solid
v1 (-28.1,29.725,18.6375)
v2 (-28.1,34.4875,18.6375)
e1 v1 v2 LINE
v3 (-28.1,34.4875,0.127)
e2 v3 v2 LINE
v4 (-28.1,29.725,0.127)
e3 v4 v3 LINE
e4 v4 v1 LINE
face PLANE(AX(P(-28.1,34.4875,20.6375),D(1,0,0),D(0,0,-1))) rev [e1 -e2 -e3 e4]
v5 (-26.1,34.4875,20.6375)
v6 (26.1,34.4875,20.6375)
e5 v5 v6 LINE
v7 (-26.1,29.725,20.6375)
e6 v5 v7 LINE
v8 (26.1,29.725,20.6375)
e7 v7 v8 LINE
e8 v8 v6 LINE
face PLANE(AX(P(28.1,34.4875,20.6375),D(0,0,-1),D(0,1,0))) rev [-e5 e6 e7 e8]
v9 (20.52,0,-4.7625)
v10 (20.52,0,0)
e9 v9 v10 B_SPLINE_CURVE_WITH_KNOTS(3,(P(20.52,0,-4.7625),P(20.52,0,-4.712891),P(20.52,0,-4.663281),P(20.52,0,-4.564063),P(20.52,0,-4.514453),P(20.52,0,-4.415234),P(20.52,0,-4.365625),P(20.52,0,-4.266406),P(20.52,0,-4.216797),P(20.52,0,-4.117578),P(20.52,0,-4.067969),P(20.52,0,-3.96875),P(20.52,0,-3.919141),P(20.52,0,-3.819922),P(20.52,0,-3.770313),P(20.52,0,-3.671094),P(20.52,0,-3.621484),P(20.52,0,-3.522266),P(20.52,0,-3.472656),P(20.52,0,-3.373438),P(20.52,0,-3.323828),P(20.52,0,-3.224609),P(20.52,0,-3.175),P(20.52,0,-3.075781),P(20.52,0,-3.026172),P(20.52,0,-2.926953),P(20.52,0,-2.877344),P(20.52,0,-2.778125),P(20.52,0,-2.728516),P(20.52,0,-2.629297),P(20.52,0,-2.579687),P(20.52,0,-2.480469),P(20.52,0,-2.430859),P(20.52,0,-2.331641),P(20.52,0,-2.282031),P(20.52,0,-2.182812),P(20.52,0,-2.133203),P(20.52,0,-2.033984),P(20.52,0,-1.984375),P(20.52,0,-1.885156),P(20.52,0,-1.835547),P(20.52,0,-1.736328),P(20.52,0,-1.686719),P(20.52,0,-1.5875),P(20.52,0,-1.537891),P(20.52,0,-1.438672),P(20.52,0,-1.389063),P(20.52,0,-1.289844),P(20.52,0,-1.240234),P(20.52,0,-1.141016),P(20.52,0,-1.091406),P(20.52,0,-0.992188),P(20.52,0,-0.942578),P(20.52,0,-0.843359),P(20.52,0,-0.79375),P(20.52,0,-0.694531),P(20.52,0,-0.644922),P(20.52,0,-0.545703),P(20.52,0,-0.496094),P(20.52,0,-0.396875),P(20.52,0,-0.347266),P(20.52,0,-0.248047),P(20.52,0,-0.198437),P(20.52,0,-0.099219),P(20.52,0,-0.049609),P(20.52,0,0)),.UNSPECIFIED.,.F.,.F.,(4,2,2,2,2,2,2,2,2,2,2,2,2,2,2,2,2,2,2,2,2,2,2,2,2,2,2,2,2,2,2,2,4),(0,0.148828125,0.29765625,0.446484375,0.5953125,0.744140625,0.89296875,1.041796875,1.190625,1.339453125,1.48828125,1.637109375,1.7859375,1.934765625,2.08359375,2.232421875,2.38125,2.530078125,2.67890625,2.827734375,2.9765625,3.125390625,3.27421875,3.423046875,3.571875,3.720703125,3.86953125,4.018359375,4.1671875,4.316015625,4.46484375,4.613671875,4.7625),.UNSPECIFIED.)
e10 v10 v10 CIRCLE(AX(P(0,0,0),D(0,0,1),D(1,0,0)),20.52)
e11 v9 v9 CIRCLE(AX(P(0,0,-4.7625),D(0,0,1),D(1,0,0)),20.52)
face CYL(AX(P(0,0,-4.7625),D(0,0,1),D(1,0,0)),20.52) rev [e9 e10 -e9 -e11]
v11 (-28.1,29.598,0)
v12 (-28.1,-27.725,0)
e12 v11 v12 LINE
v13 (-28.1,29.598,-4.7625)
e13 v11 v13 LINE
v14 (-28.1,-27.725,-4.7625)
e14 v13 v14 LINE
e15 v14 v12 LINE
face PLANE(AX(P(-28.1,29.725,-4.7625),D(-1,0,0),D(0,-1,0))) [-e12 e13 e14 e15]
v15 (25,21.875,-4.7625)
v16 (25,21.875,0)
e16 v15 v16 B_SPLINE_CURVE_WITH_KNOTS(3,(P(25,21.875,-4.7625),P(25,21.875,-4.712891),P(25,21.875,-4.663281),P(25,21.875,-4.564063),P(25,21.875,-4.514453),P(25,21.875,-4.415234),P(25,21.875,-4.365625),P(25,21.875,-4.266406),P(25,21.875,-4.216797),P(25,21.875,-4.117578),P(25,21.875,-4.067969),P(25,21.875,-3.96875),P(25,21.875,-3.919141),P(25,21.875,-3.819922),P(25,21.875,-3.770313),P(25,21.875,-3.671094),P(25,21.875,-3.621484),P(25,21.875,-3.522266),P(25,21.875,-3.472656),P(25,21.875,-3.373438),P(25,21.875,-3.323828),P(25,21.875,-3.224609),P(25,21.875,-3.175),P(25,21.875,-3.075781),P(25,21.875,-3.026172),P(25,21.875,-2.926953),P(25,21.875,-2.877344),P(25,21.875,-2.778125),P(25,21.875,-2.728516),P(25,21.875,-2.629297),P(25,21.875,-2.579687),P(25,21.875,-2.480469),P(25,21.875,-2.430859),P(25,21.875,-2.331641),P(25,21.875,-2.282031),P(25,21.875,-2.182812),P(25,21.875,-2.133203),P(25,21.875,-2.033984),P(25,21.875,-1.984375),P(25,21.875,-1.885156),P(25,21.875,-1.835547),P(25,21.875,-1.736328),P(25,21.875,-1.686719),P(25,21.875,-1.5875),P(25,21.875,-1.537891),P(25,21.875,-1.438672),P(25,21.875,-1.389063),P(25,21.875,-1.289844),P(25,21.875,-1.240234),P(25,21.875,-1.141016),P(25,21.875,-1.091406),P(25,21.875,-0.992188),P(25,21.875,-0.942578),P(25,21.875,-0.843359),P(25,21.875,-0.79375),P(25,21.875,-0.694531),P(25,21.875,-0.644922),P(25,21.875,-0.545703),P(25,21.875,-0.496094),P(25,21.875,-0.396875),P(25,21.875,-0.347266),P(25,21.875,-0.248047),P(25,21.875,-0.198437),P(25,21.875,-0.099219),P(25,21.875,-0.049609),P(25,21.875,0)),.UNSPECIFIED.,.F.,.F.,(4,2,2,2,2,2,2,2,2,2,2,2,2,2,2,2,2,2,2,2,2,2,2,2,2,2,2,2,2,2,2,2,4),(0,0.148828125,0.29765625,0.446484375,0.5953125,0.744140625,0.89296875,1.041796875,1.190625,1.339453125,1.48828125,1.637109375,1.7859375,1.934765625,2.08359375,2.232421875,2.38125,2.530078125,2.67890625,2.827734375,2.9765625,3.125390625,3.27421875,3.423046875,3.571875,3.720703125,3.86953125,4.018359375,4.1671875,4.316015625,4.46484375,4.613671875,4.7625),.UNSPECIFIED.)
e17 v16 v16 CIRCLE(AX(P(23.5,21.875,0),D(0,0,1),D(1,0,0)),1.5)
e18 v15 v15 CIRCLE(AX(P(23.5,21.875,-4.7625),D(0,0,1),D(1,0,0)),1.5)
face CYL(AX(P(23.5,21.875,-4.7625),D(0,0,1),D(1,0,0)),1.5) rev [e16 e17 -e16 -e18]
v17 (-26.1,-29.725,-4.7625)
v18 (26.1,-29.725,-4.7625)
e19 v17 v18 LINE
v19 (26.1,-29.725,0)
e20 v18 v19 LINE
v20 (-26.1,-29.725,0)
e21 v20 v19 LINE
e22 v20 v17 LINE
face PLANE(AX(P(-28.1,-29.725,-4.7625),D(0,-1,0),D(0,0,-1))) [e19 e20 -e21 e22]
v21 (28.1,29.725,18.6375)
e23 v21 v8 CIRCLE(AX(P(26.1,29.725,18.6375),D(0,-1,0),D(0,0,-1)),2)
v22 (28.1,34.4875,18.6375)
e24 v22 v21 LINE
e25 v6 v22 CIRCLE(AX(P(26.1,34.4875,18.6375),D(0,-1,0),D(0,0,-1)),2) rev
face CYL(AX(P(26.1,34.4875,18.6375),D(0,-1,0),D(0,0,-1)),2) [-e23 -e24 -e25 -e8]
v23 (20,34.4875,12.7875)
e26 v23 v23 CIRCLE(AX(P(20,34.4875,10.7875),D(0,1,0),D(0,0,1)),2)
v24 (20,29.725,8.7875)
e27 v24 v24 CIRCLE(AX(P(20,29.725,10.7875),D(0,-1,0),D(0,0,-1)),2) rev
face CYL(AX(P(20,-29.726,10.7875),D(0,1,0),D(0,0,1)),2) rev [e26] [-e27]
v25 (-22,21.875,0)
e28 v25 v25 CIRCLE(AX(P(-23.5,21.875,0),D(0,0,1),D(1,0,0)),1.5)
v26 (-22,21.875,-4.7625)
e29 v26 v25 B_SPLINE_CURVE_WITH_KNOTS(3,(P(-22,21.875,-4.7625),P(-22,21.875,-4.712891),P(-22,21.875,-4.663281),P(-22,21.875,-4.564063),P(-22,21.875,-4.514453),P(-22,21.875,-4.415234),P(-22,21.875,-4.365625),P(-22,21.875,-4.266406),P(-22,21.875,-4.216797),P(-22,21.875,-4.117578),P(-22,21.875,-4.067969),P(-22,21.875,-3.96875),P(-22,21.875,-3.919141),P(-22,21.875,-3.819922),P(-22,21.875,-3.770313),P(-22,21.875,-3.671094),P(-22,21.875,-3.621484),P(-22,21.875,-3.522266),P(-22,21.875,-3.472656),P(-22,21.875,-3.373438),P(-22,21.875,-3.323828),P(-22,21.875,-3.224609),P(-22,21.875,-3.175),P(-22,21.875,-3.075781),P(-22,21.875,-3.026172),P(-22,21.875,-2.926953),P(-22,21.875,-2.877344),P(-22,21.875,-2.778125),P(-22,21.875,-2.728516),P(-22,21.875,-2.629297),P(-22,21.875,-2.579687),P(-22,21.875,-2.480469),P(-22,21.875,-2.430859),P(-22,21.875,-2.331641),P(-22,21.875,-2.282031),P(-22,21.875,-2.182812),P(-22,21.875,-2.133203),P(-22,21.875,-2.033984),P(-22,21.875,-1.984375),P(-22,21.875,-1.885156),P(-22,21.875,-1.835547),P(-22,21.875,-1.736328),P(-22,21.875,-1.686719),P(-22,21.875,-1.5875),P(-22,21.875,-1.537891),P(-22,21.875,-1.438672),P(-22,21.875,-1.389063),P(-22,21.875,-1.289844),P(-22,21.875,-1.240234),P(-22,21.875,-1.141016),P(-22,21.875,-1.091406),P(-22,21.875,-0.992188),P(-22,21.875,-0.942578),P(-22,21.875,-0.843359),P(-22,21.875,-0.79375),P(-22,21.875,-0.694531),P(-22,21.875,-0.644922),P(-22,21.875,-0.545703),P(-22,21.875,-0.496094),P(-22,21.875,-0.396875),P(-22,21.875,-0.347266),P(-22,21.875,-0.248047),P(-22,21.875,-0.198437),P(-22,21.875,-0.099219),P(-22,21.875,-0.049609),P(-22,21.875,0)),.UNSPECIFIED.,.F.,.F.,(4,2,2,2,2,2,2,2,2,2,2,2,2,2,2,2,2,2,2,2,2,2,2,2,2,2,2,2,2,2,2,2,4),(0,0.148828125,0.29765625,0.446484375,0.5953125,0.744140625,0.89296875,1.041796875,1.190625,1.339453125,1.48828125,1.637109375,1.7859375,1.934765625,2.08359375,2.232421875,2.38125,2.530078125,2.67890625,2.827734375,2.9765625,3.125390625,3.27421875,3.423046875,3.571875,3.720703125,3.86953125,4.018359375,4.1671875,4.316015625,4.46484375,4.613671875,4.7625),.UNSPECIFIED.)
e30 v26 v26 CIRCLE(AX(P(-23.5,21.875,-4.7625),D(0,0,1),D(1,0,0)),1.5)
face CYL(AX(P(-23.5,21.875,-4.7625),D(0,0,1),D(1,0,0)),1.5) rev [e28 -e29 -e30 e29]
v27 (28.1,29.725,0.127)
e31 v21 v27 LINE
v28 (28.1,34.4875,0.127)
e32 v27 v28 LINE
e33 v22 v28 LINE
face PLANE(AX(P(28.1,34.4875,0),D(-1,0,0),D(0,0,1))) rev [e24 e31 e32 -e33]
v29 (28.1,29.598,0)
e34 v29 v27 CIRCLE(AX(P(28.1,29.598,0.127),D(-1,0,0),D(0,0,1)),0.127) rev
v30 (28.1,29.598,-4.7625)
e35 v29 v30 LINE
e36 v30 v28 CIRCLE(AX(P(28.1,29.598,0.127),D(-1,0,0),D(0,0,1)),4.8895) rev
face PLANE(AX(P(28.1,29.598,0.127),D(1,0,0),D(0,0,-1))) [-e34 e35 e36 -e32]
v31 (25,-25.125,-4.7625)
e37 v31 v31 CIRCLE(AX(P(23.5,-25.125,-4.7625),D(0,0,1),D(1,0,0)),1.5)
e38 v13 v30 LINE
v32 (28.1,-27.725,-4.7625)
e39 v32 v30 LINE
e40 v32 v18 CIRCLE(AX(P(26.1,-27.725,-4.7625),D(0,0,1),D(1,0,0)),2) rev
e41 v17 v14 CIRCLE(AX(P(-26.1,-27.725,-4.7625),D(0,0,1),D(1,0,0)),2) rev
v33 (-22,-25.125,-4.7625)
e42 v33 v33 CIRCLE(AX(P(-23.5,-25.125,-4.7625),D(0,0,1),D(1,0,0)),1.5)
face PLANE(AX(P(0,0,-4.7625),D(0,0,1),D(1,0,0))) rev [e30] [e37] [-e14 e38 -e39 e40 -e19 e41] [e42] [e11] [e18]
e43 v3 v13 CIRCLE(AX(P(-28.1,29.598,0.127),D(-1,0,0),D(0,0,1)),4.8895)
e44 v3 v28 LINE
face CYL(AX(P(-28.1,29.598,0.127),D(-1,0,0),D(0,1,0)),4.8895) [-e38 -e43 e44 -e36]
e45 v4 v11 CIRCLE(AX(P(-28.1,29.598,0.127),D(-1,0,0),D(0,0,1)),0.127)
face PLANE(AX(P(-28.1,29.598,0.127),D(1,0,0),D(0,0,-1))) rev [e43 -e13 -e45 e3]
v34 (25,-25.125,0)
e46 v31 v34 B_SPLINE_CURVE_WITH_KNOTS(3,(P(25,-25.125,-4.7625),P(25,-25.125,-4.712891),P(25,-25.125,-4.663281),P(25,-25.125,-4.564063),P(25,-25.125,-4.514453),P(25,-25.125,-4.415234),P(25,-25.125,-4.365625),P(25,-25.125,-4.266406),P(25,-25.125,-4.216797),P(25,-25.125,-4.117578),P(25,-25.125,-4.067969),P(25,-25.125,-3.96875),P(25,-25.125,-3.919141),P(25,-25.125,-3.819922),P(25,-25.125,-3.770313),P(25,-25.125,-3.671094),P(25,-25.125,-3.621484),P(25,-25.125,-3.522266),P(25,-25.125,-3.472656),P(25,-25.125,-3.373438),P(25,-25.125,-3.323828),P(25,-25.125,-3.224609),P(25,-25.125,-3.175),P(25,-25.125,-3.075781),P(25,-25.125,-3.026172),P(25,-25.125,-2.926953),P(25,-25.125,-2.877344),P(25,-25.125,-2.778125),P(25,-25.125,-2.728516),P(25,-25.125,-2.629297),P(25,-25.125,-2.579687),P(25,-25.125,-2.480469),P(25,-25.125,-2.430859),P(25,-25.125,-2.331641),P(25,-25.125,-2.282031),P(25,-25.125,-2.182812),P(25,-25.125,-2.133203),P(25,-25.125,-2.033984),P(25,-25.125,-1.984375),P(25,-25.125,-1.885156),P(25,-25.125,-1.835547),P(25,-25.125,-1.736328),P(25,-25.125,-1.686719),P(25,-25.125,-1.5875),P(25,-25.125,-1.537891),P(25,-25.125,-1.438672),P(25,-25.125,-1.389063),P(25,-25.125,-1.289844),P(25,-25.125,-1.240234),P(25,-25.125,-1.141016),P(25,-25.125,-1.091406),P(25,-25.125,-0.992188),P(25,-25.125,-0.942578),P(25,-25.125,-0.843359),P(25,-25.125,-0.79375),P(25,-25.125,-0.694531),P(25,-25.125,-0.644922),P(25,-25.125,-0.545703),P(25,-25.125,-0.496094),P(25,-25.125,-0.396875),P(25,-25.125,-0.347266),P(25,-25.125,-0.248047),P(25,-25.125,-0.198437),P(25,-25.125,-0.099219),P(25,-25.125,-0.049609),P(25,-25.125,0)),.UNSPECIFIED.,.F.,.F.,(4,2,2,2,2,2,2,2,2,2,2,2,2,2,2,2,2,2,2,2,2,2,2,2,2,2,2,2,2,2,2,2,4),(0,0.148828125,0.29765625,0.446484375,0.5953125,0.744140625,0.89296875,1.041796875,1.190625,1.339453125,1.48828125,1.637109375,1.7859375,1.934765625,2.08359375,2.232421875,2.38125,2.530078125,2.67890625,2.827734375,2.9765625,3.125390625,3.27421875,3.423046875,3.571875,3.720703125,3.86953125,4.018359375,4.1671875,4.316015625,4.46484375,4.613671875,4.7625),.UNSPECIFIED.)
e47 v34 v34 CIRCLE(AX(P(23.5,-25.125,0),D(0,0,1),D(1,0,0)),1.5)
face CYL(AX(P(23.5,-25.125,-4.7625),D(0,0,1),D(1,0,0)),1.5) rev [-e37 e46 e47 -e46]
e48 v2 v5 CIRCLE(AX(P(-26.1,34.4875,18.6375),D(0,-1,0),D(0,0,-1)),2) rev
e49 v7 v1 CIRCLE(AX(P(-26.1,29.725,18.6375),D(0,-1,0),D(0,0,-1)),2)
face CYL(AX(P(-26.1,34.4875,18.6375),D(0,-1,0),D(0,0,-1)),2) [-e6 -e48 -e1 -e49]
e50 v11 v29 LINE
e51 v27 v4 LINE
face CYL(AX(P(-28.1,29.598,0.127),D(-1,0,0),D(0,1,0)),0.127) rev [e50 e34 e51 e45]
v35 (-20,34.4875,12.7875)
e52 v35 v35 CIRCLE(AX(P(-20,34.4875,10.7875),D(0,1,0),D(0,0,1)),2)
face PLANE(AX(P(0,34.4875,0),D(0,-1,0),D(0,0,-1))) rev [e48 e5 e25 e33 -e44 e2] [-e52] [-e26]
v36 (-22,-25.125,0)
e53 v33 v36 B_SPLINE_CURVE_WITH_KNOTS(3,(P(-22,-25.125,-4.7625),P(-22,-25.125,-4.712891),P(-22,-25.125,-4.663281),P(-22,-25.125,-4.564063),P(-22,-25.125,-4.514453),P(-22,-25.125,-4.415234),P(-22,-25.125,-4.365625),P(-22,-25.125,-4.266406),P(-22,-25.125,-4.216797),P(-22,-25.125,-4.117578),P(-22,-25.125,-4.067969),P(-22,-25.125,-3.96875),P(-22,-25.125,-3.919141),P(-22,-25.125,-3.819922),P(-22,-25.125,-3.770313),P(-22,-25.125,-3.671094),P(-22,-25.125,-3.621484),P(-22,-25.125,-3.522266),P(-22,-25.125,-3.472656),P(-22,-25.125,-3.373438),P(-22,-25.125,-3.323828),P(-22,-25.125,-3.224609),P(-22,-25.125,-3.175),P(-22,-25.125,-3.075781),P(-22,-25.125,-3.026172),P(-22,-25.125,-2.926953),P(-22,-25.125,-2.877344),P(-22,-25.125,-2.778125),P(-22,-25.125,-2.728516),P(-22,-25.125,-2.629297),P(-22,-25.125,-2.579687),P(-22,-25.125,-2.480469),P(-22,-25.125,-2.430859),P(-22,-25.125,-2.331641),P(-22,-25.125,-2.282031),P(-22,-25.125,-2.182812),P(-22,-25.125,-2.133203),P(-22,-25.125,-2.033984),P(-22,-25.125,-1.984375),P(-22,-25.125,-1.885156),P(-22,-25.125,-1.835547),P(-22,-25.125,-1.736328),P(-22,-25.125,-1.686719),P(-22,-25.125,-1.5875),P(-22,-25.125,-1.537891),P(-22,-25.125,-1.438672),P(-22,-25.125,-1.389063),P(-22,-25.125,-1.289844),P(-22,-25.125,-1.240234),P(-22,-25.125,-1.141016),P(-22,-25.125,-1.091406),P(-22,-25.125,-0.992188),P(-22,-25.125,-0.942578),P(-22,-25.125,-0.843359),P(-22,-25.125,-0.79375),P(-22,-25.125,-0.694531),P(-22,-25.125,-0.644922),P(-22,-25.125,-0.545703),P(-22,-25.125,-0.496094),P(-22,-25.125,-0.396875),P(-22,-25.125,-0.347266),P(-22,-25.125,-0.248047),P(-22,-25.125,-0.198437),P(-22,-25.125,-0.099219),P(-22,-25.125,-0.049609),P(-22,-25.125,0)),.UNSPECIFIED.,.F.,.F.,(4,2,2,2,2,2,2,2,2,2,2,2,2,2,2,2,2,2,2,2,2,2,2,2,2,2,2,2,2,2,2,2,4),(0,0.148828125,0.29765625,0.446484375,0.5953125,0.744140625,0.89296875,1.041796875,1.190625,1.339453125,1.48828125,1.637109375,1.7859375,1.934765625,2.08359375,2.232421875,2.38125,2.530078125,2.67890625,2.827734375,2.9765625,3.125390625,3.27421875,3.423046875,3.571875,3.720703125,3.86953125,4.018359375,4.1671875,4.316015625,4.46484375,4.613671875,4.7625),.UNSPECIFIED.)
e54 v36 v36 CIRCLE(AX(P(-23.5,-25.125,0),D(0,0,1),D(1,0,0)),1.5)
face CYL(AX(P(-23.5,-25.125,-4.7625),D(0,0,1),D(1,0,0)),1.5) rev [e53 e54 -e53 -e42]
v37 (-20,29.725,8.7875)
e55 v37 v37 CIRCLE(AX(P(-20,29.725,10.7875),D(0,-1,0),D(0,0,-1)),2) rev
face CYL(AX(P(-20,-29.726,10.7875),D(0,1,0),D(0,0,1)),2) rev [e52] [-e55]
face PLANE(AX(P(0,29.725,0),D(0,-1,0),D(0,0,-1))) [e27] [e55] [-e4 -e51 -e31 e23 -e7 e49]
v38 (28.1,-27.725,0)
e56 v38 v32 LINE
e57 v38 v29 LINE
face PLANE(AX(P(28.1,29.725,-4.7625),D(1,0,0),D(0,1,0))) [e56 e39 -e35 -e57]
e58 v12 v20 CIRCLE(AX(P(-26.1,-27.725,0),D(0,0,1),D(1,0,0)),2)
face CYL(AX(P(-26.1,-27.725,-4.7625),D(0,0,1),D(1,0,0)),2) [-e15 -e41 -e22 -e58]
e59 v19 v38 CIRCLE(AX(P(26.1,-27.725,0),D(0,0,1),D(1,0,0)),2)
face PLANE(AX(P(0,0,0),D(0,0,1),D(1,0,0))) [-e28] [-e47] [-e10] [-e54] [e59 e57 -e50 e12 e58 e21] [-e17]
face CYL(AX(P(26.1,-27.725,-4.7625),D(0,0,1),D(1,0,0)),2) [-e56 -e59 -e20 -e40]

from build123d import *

# Parameters (mm, degrees)
SKETCH1_W                    = 56.2
SKETCH1_H                    = 59.45
SKETCH1_R                    = 20.52
SKETCH1_R_2                  = 1.5
BASE_FLANGE1_DEPTH           = 4.7625
EDGE_FLANGE1_STRIP_W         = 19.304
EDGE_FLANGE1_STRIP_H         = 4.7625
EDGE_FLANGE1_STRIP_CUT_DEPTH = 56.2
EDGE_FLANGE1_DEPTH           = 56.2
FILLET1_R                    = 2
CUT_EXTRUDE1_REACH           = 75.067
SKETCH11_R                   = 2


# Sheet-metal steps are written as plain solids
with BuildPart() as part:
    # Sketch1 → Base-Flange1 (new body)
    with BuildSketch(Plane.XY):
        Rectangle(SKETCH1_W, SKETCH1_H)
        Circle(SKETCH1_R, mode=Mode.SUBTRACT)
        with Locations((-23.5, 21.874999952)):
            Circle(SKETCH1_R_2, mode=Mode.SUBTRACT)
        with Locations((23.5, 21.874999952)):
            Circle(SKETCH1_R_2, mode=Mode.SUBTRACT)
        with Locations((-23.5, -25.125)):
            Circle(SKETCH1_R_2, mode=Mode.SUBTRACT)
        with Locations((23.5, -25.125)):
            Circle(SKETCH1_R_2, mode=Mode.SUBTRACT)
    extrude(amount=-BASE_FLANGE1_DEPTH)

    # Edge-Flange1 strip (across the edge) → Edge-Flange1 strip cut (cut)
    with BuildSketch(Plane(origin=(28.1, 29.725, 0), x_dir=(0, -1, 0), z_dir=(-1, 0, 0))):
        with Locations((-9.525, -2.38125)):
            Rectangle(EDGE_FLANGE1_STRIP_W, EDGE_FLANGE1_STRIP_H)
    extrude(amount=EDGE_FLANGE1_STRIP_CUT_DEPTH, mode=Mode.SUBTRACT)

    # Edge-Flange1 section (across the edge) → Edge-Flange1 (add)
    with BuildSketch(Plane(origin=(28.1, 29.725, 0), x_dir=(0, -1, 0), z_dir=(-1, 0, 0))):
        with BuildLine():
            Line((-4.7625, 0.127), (-4.7625, 20.6375))
            Line((-4.7625, 20.6375), (0, 20.6375))
            Line((0, 20.6375), (0, 0.127))
            ThreePointArc((0, 0.127), (0.037197439, 0.037197439), (0.127, 0))
            Line((0.127, 0), (0.127, -4.7625))
            ThreePointArc((0.127, -4.7625), (-3.330398607, -3.330398607), (-4.7625, 0.127))
        make_face()
    extrude(amount=EDGE_FLANGE1_DEPTH)

    # Fillet1
    fillet1_edges = [part.edges().sort_by_distance(p)[0] for p in [
        (28.1, 32.10625, 20.6375),
        (-28.1, 32.10625, 20.6375),
        (28.1, -29.725, -2.38125),
        (-28.1, -29.725, -2.38125),
    ]]
    fillet(fillet1_edges, radius=FILLET1_R)

    # Sketch11 → Cut-Extrude1 (cut, up to next)
    with BuildSketch(Plane(origin=(0, 34.4875, 0), x_dir=(1, 0, 0), z_dir=(0, 1, 0)), mode=Mode.PRIVATE) as cut_extrude1_sk1:
        with Locations(Location((-20, -10.7875, 0), (0, 0, 270))):
            Circle(SKETCH11_R)
    cut_extrude1_tool1 = extrude(cut_extrude1_sk1.sketch, amount=-CUT_EXTRUDE1_REACH, mode=Mode.PRIVATE) & part.part
    # Sketch11 → Cut-Extrude1 (cut, up to next)
    with BuildSketch(Plane(origin=(0, 34.4875, 0), x_dir=(1, 0, 0), z_dir=(0, 1, 0)), mode=Mode.PRIVATE) as cut_extrude1_sk2:
        with Locations(Location((20, -10.7875, 0), (0, 0, 270))):
            Circle(SKETCH11_R)
    cut_extrude1_tool2 = extrude(cut_extrude1_sk2.sketch, amount=-CUT_EXTRUDE1_REACH, mode=Mode.PRIVATE) & part.part
    add(cut_extrude1_tool1.solids().sort_by_distance((-20, 34.4875, 10.7875))[0], mode=Mode.SUBTRACT)
    add(cut_extrude1_tool2.solids().sort_by_distance((20, 34.4875, 10.7875))[0], mode=Mode.SUBTRACT)


solid = part.part
